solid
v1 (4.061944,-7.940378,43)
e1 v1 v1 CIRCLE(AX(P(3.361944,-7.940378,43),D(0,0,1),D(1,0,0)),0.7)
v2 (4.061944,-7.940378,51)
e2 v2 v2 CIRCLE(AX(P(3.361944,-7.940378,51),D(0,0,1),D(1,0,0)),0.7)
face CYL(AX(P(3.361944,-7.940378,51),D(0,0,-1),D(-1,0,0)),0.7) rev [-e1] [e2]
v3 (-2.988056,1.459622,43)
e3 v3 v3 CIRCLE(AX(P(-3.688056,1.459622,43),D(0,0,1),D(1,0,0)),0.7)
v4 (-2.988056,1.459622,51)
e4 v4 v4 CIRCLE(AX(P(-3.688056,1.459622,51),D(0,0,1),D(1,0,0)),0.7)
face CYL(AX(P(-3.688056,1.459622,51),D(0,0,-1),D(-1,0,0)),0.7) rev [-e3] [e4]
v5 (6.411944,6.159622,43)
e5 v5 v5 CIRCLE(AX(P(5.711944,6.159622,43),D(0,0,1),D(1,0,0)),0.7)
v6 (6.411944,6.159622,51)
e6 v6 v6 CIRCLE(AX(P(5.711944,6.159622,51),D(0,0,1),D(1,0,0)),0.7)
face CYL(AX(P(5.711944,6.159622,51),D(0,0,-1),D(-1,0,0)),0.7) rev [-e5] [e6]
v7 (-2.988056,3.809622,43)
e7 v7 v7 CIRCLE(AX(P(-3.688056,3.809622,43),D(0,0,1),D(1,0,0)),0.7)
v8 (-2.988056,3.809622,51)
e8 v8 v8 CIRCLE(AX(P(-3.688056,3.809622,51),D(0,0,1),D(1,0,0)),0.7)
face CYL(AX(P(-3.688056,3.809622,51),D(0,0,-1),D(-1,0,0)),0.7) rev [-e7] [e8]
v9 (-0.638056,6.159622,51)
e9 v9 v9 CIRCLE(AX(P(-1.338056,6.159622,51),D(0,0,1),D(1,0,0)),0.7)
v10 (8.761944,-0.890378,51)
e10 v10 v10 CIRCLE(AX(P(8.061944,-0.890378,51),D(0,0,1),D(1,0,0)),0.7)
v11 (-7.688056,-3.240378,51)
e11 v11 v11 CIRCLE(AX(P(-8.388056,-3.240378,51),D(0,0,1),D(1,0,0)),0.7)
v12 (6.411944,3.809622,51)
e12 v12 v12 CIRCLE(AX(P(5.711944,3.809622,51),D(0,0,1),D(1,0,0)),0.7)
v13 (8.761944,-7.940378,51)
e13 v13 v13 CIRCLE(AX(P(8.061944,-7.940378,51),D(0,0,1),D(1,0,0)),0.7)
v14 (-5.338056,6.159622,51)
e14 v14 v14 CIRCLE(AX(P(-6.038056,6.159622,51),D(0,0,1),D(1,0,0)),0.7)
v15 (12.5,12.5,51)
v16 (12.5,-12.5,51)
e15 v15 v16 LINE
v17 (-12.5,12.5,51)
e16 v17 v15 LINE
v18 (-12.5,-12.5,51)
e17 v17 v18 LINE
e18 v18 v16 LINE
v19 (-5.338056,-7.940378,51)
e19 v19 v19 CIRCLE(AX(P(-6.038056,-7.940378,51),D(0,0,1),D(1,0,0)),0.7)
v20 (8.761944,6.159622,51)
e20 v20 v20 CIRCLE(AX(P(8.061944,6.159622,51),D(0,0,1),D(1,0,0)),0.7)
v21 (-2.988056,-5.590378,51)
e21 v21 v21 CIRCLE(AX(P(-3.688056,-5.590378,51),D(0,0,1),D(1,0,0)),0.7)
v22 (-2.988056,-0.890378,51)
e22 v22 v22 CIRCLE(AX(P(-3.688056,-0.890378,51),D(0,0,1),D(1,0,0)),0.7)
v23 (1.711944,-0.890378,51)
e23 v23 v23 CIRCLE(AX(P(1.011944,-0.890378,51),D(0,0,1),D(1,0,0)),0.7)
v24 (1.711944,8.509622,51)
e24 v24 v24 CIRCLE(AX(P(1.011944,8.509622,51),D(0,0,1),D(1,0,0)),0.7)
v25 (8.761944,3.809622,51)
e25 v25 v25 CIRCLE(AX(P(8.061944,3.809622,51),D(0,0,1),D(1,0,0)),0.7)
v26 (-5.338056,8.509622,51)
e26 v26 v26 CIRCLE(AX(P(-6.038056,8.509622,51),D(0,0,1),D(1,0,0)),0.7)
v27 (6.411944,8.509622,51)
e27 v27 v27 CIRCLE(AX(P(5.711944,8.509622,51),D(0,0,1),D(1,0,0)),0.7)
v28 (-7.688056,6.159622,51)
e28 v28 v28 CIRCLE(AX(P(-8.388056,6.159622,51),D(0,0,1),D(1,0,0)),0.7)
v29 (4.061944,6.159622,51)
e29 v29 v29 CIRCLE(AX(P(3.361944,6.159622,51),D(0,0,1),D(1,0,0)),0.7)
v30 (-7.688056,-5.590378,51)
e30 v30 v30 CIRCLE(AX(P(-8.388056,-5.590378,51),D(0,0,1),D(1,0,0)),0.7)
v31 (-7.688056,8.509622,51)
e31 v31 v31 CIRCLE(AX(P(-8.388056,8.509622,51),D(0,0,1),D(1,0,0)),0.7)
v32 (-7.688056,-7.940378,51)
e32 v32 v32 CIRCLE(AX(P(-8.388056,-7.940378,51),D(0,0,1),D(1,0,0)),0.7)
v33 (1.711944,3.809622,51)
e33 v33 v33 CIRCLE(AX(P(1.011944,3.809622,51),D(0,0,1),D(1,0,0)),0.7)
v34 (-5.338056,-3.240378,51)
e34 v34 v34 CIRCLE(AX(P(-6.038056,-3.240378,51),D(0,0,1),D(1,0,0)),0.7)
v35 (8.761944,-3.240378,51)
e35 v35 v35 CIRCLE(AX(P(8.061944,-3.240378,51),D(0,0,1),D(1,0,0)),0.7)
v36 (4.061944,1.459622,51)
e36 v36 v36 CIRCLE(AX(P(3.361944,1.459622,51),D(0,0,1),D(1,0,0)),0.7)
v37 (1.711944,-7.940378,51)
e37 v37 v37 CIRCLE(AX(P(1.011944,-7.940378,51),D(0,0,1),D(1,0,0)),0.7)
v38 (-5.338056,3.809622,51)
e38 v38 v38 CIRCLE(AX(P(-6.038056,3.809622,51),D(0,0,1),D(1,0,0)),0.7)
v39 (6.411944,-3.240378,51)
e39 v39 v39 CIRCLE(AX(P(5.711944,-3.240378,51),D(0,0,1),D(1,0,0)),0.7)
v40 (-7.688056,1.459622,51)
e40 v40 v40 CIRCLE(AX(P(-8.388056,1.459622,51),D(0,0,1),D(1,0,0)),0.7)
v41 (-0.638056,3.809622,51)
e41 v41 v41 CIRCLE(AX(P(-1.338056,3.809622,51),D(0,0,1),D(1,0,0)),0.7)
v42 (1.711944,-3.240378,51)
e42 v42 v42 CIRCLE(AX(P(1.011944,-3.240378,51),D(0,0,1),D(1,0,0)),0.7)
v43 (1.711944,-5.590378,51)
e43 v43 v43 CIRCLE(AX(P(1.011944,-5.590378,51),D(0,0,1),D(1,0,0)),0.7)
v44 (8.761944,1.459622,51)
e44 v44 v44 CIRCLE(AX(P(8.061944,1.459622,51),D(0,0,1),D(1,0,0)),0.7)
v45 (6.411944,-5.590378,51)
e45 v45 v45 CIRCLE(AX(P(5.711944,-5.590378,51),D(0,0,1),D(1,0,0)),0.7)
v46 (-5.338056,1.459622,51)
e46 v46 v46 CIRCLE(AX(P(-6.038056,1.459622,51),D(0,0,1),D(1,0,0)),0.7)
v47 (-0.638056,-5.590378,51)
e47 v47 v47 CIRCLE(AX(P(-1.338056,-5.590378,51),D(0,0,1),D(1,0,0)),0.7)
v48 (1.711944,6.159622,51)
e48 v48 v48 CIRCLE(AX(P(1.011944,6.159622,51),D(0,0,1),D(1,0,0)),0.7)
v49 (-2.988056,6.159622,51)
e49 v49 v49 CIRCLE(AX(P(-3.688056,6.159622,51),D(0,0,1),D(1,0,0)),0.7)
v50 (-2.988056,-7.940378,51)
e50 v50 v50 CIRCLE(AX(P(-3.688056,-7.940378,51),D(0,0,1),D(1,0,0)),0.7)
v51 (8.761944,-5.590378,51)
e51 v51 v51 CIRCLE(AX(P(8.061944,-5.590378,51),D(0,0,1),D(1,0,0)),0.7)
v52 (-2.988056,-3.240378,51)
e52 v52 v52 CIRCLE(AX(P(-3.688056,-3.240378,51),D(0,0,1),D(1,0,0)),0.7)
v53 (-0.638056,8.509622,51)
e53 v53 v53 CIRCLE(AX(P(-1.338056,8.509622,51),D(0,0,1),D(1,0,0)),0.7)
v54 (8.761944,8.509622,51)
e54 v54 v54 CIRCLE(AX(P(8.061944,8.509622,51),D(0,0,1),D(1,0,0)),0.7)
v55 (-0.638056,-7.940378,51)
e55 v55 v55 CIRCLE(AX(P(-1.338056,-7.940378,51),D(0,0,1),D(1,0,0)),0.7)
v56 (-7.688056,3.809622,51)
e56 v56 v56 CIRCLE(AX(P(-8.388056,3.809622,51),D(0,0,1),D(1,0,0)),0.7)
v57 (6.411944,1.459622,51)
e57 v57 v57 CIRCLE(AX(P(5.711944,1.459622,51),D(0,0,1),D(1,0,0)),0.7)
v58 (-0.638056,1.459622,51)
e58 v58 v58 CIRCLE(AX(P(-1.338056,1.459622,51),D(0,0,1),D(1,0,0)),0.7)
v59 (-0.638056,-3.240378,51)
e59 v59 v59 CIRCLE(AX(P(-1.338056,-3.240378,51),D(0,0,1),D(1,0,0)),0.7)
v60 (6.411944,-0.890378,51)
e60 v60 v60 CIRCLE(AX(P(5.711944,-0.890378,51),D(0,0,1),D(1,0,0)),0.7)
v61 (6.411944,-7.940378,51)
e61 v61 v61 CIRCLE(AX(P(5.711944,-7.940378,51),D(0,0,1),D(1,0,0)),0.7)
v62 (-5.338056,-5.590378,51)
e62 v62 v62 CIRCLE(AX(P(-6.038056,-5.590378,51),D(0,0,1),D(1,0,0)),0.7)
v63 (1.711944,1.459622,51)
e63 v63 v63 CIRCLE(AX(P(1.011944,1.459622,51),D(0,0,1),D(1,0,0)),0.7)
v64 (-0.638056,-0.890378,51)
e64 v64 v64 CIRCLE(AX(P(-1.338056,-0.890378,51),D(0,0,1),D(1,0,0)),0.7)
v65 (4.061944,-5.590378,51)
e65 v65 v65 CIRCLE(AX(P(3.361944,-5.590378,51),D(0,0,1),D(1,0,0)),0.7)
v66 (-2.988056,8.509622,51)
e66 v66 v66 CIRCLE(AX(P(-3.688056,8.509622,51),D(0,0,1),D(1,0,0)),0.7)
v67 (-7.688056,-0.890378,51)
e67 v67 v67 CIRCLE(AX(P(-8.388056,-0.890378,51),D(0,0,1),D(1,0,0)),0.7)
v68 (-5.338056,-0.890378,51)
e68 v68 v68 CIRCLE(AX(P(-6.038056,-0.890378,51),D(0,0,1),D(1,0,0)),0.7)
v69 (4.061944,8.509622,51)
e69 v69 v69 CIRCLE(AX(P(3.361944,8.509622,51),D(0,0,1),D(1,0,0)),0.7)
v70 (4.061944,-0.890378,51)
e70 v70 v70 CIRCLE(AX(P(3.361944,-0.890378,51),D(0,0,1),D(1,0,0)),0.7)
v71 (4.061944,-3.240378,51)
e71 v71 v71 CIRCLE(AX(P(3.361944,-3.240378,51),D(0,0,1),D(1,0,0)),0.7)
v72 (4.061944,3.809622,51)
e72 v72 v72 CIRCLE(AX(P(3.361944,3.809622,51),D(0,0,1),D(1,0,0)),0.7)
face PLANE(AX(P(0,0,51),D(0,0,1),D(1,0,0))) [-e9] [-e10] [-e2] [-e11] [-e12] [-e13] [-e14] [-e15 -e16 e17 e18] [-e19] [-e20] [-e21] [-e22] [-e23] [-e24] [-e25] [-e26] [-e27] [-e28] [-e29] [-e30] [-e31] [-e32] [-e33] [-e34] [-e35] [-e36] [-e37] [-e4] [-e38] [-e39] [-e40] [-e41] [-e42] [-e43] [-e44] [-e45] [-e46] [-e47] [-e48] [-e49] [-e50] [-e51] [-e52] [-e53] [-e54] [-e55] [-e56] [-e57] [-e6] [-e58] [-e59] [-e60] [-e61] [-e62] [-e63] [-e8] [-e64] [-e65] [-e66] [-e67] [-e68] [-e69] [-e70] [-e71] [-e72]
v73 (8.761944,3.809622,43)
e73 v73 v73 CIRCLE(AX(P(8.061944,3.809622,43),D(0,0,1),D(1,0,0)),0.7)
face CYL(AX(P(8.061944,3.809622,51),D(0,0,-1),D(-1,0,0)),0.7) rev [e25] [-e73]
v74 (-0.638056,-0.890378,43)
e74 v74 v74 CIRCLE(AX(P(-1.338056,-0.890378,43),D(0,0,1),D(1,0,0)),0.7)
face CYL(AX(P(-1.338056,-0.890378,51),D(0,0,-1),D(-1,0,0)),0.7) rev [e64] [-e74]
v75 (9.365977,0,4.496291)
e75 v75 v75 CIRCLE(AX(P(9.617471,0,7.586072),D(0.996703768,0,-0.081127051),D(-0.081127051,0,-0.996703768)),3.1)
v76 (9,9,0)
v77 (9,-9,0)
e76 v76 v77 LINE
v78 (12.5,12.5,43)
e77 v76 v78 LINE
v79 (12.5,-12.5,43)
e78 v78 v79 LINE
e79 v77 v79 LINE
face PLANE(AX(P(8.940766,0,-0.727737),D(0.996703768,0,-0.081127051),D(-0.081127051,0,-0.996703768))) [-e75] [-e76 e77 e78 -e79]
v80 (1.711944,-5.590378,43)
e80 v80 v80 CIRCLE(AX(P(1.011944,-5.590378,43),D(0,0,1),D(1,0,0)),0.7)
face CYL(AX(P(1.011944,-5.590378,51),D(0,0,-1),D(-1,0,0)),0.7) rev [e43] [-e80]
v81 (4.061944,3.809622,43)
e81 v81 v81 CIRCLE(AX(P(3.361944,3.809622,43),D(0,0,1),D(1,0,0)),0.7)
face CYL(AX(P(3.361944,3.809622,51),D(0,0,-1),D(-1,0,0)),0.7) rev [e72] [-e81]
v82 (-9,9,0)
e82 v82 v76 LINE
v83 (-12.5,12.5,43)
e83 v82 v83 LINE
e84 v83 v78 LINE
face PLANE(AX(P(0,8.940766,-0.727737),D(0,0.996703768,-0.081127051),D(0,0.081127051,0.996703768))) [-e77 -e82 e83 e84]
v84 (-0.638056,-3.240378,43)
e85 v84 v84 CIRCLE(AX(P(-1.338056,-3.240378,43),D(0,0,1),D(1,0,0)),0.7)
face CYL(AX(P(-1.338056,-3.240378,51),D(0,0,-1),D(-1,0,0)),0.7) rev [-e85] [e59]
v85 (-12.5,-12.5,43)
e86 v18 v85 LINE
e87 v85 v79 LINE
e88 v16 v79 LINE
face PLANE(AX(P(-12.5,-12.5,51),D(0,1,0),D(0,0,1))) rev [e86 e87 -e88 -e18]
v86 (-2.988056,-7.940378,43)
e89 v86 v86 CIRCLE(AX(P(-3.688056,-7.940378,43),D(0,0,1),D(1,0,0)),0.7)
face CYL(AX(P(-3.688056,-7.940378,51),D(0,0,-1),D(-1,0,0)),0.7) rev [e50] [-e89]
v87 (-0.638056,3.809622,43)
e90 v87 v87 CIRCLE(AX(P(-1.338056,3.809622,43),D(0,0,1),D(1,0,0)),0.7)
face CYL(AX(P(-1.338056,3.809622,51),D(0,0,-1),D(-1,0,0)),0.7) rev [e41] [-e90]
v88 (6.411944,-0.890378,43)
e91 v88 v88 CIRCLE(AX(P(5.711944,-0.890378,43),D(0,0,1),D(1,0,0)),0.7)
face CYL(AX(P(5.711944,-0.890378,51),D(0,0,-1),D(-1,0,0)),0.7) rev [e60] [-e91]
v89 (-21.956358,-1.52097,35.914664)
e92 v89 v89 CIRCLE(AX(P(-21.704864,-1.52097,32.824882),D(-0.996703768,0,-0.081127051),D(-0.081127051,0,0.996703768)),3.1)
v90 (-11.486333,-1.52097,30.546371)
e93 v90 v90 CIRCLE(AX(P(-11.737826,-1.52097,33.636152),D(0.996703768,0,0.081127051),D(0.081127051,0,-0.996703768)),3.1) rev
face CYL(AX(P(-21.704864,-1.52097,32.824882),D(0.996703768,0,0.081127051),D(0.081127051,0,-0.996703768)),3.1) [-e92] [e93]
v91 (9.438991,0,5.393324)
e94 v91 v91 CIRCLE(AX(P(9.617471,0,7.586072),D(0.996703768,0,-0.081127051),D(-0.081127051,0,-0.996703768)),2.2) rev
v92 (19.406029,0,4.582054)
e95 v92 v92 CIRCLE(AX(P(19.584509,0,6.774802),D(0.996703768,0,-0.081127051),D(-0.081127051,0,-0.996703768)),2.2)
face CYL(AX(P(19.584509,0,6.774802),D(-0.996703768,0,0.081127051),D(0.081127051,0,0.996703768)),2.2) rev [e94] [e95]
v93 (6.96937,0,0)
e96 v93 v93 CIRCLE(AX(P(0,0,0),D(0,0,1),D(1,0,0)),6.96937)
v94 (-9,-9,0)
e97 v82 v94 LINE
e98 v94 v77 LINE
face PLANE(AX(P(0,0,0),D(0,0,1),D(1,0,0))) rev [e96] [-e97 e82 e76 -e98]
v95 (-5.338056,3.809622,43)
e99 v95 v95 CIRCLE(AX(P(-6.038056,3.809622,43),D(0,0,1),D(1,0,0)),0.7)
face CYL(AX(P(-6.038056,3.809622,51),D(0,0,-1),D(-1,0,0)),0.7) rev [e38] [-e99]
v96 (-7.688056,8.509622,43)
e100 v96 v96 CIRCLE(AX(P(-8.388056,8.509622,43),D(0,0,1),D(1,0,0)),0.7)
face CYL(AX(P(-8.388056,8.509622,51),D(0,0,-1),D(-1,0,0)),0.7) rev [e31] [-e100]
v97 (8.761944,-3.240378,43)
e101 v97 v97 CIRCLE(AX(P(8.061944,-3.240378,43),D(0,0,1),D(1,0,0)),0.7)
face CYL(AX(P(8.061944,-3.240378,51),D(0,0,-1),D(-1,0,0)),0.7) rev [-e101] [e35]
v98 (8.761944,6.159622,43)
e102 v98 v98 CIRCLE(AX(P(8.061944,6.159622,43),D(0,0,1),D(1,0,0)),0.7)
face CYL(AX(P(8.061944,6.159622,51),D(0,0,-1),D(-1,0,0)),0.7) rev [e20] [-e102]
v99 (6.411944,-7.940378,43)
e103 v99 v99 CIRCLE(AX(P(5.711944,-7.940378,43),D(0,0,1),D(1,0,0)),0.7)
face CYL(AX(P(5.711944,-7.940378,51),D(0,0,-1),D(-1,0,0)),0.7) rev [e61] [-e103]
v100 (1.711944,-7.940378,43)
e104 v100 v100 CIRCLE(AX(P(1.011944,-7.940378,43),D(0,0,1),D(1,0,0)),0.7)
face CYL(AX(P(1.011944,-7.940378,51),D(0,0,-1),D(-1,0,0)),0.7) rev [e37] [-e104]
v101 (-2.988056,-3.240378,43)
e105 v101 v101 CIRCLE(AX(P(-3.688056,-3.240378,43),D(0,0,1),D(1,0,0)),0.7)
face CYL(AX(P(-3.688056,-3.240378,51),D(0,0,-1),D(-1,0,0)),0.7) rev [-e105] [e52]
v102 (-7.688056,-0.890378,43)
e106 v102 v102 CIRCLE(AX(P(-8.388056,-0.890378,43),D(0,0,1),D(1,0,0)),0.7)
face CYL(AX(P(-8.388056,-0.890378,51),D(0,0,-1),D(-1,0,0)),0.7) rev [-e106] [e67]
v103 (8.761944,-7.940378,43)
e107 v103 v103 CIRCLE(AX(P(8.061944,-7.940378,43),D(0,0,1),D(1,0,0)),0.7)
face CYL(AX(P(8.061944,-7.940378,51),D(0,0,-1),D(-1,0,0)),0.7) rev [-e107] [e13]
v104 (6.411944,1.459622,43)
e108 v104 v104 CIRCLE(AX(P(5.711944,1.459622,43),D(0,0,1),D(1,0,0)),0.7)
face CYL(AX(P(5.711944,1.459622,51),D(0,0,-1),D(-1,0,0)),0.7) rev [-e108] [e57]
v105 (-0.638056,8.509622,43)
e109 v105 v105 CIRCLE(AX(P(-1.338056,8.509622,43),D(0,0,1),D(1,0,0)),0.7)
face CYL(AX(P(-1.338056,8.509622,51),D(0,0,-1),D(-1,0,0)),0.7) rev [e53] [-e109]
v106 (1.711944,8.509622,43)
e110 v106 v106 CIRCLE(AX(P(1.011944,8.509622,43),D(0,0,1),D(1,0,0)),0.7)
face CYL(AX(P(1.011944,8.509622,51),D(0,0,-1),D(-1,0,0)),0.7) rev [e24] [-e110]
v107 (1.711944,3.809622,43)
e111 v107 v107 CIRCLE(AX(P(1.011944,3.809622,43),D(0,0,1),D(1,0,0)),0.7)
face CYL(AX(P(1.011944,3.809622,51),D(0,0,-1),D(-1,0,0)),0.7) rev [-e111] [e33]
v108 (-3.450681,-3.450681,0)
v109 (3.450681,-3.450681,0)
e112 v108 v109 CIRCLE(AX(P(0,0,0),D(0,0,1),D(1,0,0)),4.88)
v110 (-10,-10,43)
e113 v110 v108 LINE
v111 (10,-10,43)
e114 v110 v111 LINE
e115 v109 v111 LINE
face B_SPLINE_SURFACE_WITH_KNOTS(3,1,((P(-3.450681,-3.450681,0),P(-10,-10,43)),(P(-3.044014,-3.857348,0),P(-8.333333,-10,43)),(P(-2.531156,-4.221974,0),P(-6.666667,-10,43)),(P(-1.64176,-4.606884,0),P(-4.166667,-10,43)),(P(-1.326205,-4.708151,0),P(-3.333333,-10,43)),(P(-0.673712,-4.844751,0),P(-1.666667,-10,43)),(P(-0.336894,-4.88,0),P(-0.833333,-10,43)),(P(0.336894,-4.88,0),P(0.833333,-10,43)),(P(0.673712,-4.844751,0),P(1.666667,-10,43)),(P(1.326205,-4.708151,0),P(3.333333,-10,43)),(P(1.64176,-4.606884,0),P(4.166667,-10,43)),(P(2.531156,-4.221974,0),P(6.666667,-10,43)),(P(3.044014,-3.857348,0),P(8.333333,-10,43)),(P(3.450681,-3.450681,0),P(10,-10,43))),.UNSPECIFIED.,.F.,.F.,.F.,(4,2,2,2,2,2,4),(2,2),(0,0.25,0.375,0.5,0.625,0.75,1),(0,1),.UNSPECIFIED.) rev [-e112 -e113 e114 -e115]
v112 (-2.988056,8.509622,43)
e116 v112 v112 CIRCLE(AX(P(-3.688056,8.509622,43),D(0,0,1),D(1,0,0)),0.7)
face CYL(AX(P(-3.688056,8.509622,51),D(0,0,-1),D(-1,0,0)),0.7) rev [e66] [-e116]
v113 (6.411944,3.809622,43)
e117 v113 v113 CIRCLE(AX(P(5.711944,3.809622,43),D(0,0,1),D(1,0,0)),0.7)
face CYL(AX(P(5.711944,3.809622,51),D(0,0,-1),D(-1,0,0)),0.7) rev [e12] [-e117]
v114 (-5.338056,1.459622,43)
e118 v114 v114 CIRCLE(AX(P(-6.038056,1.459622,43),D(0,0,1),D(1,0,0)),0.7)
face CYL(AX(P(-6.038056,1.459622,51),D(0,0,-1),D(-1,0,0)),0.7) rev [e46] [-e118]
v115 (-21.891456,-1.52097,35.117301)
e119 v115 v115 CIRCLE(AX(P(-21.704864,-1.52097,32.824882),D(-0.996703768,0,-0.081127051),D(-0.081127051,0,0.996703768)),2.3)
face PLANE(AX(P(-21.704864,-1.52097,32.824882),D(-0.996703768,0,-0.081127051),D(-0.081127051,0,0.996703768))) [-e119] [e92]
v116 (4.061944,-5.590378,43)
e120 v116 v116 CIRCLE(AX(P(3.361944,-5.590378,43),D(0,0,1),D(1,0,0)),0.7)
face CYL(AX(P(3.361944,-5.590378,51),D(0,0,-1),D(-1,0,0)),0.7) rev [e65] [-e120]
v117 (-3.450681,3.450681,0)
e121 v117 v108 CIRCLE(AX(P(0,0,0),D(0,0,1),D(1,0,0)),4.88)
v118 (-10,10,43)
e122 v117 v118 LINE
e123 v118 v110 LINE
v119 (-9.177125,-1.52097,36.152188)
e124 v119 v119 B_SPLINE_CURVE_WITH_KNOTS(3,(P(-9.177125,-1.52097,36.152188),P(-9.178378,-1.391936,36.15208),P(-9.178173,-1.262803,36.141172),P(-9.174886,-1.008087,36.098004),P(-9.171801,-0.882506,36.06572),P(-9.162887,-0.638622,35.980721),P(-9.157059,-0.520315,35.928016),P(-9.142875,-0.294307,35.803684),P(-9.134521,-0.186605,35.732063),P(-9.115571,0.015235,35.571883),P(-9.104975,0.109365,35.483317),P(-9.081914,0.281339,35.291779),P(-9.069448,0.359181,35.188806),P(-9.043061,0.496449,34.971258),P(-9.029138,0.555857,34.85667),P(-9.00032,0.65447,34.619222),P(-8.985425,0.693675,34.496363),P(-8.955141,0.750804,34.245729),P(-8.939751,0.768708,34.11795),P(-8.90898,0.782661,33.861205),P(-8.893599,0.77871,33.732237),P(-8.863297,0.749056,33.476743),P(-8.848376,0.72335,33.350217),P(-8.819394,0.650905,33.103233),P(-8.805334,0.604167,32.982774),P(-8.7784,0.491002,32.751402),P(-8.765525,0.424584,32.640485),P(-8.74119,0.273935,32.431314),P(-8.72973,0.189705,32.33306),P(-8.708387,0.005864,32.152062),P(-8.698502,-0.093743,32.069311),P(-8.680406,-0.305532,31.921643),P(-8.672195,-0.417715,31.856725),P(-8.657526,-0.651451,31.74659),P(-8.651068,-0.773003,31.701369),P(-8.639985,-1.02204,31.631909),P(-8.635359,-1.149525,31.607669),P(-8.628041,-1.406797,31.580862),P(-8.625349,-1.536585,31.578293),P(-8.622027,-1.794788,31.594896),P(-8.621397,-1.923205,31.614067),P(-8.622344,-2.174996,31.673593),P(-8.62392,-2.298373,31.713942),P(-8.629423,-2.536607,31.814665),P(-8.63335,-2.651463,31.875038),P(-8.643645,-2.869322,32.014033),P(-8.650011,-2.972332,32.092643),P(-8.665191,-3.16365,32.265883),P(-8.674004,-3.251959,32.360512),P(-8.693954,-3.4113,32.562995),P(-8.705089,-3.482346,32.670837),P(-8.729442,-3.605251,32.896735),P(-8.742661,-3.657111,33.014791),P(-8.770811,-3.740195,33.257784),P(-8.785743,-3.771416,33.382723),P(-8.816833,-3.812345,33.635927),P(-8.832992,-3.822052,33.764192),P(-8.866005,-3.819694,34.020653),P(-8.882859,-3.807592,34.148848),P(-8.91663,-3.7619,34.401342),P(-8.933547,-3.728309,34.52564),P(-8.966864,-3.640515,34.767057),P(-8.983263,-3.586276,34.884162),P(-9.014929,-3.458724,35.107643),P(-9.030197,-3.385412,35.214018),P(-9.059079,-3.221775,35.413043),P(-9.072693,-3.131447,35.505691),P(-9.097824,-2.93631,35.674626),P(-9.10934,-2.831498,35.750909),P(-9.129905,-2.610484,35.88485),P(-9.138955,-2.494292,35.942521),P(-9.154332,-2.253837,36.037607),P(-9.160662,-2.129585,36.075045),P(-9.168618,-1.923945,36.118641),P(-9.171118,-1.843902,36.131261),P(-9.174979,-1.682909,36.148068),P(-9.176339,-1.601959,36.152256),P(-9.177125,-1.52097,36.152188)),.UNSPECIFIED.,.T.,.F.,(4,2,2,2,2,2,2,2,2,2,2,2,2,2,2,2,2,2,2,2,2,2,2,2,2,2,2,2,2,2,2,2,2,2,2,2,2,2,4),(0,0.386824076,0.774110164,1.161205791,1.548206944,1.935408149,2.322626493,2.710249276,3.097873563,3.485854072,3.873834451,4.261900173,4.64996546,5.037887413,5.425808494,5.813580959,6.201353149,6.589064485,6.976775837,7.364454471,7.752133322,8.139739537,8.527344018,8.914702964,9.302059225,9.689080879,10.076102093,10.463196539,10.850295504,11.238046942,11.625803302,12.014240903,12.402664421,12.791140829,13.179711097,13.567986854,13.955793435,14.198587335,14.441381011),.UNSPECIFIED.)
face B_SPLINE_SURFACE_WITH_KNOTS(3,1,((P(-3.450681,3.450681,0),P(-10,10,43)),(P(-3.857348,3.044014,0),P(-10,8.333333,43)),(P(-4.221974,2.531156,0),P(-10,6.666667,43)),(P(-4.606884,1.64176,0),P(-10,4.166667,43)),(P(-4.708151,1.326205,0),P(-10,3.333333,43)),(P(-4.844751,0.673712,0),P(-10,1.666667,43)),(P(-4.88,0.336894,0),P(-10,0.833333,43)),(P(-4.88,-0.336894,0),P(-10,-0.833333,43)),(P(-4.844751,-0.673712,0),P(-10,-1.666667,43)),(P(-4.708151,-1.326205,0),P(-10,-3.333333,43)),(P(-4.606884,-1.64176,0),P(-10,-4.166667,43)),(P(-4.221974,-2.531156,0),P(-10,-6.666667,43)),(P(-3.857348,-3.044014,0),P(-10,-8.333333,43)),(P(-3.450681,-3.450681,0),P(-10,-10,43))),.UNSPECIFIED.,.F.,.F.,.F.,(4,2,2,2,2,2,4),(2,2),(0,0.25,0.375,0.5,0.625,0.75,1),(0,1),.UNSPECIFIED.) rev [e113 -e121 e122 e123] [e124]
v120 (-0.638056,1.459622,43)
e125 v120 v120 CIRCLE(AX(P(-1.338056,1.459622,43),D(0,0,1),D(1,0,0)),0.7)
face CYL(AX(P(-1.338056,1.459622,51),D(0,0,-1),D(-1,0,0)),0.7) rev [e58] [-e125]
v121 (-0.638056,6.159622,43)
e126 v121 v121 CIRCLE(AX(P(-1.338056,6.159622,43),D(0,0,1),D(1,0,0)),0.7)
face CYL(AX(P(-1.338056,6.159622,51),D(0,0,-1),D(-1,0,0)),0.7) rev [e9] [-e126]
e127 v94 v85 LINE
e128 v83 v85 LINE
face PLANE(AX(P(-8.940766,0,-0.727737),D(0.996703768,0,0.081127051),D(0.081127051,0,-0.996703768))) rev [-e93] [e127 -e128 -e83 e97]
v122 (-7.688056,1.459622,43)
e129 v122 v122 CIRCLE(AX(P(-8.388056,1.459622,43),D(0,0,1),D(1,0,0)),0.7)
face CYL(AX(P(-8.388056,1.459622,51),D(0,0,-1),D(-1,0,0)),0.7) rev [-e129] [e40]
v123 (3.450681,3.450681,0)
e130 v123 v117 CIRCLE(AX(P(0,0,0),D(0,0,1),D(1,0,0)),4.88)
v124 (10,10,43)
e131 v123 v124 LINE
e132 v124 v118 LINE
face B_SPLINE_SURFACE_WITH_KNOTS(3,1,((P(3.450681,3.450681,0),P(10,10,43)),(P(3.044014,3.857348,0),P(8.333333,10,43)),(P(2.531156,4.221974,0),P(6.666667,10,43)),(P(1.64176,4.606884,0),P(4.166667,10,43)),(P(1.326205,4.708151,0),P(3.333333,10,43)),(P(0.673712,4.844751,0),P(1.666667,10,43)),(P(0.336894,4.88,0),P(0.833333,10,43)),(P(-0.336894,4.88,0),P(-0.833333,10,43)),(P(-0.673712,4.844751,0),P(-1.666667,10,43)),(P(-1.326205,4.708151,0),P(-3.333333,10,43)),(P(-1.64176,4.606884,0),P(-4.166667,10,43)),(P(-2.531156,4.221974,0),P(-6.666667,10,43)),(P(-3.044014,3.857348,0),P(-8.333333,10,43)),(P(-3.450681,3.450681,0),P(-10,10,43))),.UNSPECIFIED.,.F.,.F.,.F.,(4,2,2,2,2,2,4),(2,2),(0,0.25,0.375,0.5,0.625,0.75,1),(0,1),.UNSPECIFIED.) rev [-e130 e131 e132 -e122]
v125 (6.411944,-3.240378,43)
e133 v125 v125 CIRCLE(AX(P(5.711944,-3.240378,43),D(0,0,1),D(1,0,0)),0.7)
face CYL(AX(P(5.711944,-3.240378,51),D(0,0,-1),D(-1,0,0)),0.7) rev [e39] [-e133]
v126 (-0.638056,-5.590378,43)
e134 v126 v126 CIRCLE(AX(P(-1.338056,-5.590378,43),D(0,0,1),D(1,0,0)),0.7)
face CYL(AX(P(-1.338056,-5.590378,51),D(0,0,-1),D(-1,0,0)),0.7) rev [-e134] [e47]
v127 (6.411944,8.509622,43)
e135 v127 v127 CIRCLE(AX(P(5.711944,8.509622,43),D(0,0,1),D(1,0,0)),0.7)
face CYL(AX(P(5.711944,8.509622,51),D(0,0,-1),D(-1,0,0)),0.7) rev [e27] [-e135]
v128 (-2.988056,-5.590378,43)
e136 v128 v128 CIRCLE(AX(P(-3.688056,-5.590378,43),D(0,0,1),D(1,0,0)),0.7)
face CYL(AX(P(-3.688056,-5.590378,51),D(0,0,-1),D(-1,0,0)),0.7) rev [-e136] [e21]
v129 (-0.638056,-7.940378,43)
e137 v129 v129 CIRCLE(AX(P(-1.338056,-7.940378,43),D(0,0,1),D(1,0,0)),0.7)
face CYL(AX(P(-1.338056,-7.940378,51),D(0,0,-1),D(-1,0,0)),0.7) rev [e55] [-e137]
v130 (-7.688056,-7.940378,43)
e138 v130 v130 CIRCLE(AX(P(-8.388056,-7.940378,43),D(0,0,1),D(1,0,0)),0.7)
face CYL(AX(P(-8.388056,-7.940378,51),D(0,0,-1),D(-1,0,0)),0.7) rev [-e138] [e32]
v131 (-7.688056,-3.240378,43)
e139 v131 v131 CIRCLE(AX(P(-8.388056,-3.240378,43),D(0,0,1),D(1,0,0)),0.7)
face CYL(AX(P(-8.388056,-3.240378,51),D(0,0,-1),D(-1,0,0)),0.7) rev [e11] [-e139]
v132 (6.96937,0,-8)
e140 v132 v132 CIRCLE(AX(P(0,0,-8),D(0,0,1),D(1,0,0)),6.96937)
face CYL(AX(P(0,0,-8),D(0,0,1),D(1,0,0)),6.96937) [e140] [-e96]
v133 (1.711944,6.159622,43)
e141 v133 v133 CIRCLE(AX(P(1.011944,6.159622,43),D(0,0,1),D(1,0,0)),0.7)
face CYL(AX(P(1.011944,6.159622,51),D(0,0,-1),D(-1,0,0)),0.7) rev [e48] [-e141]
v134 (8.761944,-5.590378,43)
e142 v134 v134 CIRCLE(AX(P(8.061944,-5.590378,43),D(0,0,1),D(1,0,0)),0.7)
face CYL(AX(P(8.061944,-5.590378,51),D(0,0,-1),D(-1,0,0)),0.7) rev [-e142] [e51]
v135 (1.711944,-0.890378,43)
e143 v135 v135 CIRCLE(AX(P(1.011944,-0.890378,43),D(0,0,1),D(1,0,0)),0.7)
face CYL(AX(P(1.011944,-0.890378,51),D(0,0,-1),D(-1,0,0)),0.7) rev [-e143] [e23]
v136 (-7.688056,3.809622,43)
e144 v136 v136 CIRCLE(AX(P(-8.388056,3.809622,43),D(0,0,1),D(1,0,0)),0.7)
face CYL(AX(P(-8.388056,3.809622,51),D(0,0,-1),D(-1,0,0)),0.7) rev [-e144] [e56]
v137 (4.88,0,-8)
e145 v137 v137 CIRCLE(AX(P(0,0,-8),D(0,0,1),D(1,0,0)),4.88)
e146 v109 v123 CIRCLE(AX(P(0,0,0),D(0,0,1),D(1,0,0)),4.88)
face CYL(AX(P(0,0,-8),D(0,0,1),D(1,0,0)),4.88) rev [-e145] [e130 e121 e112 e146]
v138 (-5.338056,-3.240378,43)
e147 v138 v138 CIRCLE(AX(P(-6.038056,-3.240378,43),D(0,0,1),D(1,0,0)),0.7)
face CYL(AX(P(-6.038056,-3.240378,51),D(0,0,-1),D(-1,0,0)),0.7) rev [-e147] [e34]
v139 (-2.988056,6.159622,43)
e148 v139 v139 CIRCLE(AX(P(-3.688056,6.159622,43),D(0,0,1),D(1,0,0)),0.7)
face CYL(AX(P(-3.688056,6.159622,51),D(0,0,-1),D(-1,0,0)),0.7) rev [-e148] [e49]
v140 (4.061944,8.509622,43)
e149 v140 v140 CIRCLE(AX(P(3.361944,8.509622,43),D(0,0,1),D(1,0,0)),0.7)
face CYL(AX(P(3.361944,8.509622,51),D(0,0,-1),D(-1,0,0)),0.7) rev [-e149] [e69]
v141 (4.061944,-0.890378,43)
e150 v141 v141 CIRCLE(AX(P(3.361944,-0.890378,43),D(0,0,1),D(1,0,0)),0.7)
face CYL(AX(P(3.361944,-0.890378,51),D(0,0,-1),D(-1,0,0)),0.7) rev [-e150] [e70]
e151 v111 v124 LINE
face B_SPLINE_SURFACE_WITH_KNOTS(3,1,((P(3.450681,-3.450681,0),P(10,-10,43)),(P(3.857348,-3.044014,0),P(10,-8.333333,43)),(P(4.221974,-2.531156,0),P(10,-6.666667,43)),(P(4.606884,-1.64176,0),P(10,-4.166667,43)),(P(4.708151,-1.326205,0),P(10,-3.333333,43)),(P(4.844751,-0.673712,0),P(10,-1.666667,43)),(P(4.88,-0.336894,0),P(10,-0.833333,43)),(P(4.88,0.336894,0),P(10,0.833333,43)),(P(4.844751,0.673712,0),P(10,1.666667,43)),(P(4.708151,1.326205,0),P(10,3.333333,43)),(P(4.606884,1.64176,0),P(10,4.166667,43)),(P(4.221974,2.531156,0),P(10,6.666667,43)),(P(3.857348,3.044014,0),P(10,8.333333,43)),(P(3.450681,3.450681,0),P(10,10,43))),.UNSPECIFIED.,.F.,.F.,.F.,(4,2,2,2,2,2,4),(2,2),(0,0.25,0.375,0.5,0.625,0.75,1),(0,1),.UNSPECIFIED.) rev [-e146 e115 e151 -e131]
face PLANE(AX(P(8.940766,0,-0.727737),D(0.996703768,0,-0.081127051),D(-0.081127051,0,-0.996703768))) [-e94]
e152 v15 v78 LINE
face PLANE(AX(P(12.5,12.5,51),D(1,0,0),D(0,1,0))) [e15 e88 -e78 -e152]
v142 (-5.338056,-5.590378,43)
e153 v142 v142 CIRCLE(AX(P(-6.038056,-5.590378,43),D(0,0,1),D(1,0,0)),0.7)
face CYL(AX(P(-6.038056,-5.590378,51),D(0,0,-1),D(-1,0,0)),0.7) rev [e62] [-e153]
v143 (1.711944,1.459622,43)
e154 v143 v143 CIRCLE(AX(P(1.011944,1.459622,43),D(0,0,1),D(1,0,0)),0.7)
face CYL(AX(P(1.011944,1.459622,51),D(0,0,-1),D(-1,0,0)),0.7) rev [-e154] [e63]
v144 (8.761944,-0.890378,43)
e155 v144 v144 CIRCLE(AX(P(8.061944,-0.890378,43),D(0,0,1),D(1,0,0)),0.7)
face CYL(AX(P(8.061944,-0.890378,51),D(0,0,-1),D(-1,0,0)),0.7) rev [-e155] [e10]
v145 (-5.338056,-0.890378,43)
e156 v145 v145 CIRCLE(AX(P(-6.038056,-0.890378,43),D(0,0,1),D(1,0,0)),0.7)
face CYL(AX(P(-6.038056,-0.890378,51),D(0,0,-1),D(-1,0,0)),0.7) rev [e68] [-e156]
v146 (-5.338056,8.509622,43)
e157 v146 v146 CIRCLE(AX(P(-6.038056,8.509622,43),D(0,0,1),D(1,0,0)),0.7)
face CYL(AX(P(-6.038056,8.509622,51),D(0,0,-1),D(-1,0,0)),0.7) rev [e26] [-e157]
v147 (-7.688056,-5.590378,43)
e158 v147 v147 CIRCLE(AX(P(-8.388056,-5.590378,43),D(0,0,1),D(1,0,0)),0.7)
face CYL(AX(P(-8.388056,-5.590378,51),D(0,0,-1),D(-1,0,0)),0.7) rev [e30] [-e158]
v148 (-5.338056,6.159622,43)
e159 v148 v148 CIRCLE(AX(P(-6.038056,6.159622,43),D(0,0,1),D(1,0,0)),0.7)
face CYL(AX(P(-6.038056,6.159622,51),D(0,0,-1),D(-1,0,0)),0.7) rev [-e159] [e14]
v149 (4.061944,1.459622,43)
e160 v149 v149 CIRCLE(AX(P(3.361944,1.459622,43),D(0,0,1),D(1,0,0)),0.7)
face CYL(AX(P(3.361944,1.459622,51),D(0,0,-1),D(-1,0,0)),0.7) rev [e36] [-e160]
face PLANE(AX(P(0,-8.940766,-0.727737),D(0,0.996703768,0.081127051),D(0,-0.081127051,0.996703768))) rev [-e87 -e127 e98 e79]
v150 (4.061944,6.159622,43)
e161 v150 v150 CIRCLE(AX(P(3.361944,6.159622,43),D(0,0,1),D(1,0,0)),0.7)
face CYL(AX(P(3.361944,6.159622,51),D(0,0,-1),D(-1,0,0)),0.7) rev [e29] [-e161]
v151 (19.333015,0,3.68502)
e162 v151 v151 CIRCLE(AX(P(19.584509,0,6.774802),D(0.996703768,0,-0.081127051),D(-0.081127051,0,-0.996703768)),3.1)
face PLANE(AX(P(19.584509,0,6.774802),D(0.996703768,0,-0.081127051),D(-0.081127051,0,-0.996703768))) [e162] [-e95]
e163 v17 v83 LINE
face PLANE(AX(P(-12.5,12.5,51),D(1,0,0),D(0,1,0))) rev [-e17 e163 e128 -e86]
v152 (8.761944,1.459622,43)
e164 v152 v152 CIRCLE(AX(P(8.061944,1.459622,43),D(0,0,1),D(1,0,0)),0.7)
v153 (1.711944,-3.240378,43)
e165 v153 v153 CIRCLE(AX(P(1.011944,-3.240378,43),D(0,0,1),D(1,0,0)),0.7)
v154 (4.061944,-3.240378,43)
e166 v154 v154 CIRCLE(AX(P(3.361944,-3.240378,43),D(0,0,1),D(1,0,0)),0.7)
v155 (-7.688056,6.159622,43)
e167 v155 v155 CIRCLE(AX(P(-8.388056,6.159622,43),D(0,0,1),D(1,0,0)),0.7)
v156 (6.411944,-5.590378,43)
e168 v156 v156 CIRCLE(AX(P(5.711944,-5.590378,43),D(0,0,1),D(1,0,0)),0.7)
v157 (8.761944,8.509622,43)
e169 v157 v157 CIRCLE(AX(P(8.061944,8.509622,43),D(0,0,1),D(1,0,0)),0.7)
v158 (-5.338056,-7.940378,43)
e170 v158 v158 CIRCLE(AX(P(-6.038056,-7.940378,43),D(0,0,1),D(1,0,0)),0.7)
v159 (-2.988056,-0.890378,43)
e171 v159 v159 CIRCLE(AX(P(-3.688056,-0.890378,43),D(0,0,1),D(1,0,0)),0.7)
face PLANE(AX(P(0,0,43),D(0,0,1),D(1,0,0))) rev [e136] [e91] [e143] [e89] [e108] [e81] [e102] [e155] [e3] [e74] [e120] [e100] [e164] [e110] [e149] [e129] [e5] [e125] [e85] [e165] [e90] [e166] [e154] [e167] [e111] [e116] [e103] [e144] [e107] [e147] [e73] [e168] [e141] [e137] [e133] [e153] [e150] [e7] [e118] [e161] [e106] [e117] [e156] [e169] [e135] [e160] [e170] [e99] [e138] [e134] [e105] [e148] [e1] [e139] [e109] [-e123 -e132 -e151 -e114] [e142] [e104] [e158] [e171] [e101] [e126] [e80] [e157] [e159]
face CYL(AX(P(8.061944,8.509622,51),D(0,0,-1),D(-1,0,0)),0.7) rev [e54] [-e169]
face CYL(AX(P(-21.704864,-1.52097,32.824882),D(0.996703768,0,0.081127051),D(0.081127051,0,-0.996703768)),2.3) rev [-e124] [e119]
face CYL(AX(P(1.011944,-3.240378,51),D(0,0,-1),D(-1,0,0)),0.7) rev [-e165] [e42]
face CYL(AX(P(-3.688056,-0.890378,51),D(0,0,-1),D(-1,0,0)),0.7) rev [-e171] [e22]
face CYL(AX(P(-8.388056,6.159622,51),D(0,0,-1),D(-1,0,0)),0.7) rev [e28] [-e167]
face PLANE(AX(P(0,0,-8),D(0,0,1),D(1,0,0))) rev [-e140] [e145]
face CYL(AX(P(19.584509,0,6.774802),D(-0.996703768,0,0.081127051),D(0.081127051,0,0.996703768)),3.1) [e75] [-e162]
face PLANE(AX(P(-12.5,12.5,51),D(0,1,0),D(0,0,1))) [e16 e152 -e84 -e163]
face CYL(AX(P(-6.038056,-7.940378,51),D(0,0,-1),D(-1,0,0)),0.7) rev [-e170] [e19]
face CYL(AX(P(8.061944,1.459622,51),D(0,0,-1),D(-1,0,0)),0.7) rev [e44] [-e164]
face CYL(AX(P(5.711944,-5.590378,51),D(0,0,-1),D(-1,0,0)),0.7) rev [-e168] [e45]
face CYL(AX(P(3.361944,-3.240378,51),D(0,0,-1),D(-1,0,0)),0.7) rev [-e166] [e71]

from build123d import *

# Parameters (mm, degrees)
SKETCH2_4_W         = 25
SKETCH2_4_H         = 25
BOSS_EXTRUDE2_DEPTH = 8
SKETCH5_R           = 0.7
CUT_EXTRUDE1_DEPTH  = 8
SKETCH6_R           = 3.1
SKETCH6_R_2         = 2.3
BOSS_EXTRUDE4_DEPTH = 10
CUT_EXTRUDE2_START  = -4
SKETCH6_4_R         = 2.3
CUT_EXTRUDE2_DEPTH  = 4
SKETCH9_R           = 3.1
SKETCH9_R_2         = 2.2
BOSS_EXTRUDE5_DEPTH = 10
SKETCH1_7_R         = 6.969369829
SKETCH1_7_R_2       = 4.88
BOSS_EXTRUDE7_DEPTH = 8


with BuildPart() as part:
    # Sketch1 → Loft1 section 0
    with BuildSketch(Plane.XY):
        with BuildLine():
            Line((-9, 9), (9, 9))
            Line((9, 9), (9, -9))
            Line((9, -9), (-9, -9))
            Line((-9, -9), (-9, 9))
        make_face()
    # Sketch2 → Loft1 section 1
    with BuildSketch(Plane.XY.offset(43)):
        with BuildLine():
            Line((-12.5, 12.5), (12.5, 12.5))
            Line((12.5, 12.5), (12.5, -12.5))
            Line((12.5, -12.5), (-12.5, -12.5))
            Line((-12.5, -12.5), (-12.5, 12.5))
        make_face()
    loft()

    # Cut-Loft1: read off the stored shape, not the designer's step
    # Cut-Loft1: loft between two sections, ruled curve by curve
    cut_loft1_from = [
        Edge.make_bspline([(-3.450681092, -3.450681092, 0), (-3.044014426, -3.857347759, 0), (-2.531155679, -4.22197395, 0), (-1.641760344, -4.606883572, 0), (-1.326204919, -4.708150629, 0), (-0.673711552, -4.84475124, 0), (-0.336893697, -4.88, 0), (0.336893697, -4.88, 0), (0.673711552, -4.84475124, 0), (1.326204919, -4.708150629, 0), (1.641760344, -4.606883572, 0), (2.531155679, -4.22197395, 0), (3.044014426, -3.857347759, 0), (3.450681092, -3.450681092, 0)], [0, 0, 0, 0, 0.25, 0.25, 0.375, 0.375, 0.5, 0.5, 0.625, 0.625, 0.75, 0.75, 1, 1, 1, 1], 3),
        Edge.make_bspline([(3.450681092, -3.450681092, 0), (3.857347759, -3.044014426, 0), (4.22197395, -2.531155679, 0), (4.606883572, -1.641760344, 0), (4.708150629, -1.326204919, 0), (4.84475124, -0.673711552, 0), (4.88, -0.336893697, 0), (4.88, 0.336893697, 0), (4.84475124, 0.673711552, 0), (4.708150629, 1.326204919, 0), (4.606883572, 1.641760344, 0), (4.22197395, 2.531155679, 0), (3.857347759, 3.044014426, 0), (3.450681092, 3.450681092, 0)], [0, 0, 0, 0, 0.25, 0.25, 0.375, 0.375, 0.5, 0.5, 0.625, 0.625, 0.75, 0.75, 1, 1, 1, 1], 3),
        Edge.make_bspline([(-3.450681092, 3.450681092, 0), (-3.857347759, 3.044014426, 0), (-4.22197395, 2.531155679, 0), (-4.606883572, 1.641760344, 0), (-4.708150629, 1.326204919, 0), (-4.84475124, 0.673711552, 0), (-4.88, 0.336893697, 0), (-4.88, -0.336893697, 0), (-4.84475124, -0.673711552, 0), (-4.708150629, -1.326204919, 0), (-4.606883572, -1.641760344, 0), (-4.22197395, -2.531155679, 0), (-3.857347759, -3.044014426, 0), (-3.450681092, -3.450681092, 0)], [0, 0, 0, 0, 0.25, 0.25, 0.375, 0.375, 0.5, 0.5, 0.625, 0.625, 0.75, 0.75, 1, 1, 1, 1], 3),
        Edge.make_bspline([(3.450681092, 3.450681092, 0), (3.044014426, 3.857347759, 0), (2.531155679, 4.22197395, 0), (1.641760344, 4.606883572, 0), (1.326204919, 4.708150629, 0), (0.673711552, 4.84475124, 0), (0.336893697, 4.88, 0), (-0.336893697, 4.88, 0), (-0.673711552, 4.84475124, 0), (-1.326204919, 4.708150629, 0), (-1.641760344, 4.606883572, 0), (-2.531155679, 4.22197395, 0), (-3.044014426, 3.857347759, 0), (-3.450681092, 3.450681092, 0)], [0, 0, 0, 0, 0.25, 0.25, 0.375, 0.375, 0.5, 0.5, 0.625, 0.625, 0.75, 0.75, 1, 1, 1, 1], 3),
    ]
    cut_loft1_to = [
        Edge.make_bspline([(-10, -10, 43), (-8.333333333, -10, 43), (-6.666666667, -10, 43), (-4.166666667, -10, 43), (-3.333333333, -10, 43), (-1.666666667, -10, 43), (-0.833333333, -10, 43), (0.833333333, -10, 43), (1.666666667, -10, 43), (3.333333333, -10, 43), (4.166666667, -10, 43), (6.666666667, -10, 43), (8.333333333, -10, 43), (10, -10, 43)], [0, 0, 0, 0, 0.25, 0.25, 0.375, 0.375, 0.5, 0.5, 0.625, 0.625, 0.75, 0.75, 1, 1, 1, 1], 3),
        Edge.make_bspline([(10, -10, 43), (10, -8.333333333, 43), (10, -6.666666667, 43), (10, -4.166666667, 43), (10, -3.333333333, 43), (10, -1.666666667, 43), (10, -0.833333333, 43), (10, 0.833333333, 43), (10, 1.666666667, 43), (10, 3.333333333, 43), (10, 4.166666667, 43), (10, 6.666666667, 43), (10, 8.333333333, 43), (10, 10, 43)], [0, 0, 0, 0, 0.25, 0.25, 0.375, 0.375, 0.5, 0.5, 0.625, 0.625, 0.75, 0.75, 1, 1, 1, 1], 3),
        Edge.make_bspline([(-10, 10, 43), (-10, 8.333333333, 43), (-10, 6.666666667, 43), (-10, 4.166666667, 43), (-10, 3.333333333, 43), (-10, 1.666666667, 43), (-10, 0.833333333, 43), (-10, -0.833333333, 43), (-10, -1.666666667, 43), (-10, -3.333333333, 43), (-10, -4.166666667, 43), (-10, -6.666666667, 43), (-10, -8.333333333, 43), (-10, -10, 43)], [0, 0, 0, 0, 0.25, 0.25, 0.375, 0.375, 0.5, 0.5, 0.625, 0.625, 0.75, 0.75, 1, 1, 1, 1], 3),
        Edge.make_bspline([(10, 10, 43), (8.333333333, 10, 43), (6.666666667, 10, 43), (4.166666667, 10, 43), (3.333333333, 10, 43), (1.666666667, 10, 43), (0.833333333, 10, 43), (-0.833333333, 10, 43), (-1.666666667, 10, 43), (-3.333333333, 10, 43), (-4.166666667, 10, 43), (-6.666666667, 10, 43), (-8.333333333, 10, 43), (-10, 10, 43)], [0, 0, 0, 0, 0.25, 0.25, 0.375, 0.375, 0.5, 0.5, 0.625, 0.625, 0.75, 0.75, 1, 1, 1, 1], 3),
    ]
    cut_loft1 = Solid(Shell([*[Face.make_surface_from_curves(cut_loft1_from[k], cut_loft1_to[k]) for k in range(4)], Face(Wire(cut_loft1_from)), Face(Wire(cut_loft1_to))]))
    add(cut_loft1, mode=Mode.SUBTRACT)

    # Sketch2<4> → Boss-Extrude2 (add)
    with BuildSketch(Plane.XY.offset(43)):
        Rectangle(SKETCH2_4_W, SKETCH2_4_H)
    extrude(amount=BOSS_EXTRUDE2_DEPTH)

    # Sketch5 → Cut-Extrude1 (cut)
    with BuildSketch(Plane.XY.offset(43)):
        with Locations((-8.388056057, 8.509622087)):
            Circle(SKETCH5_R)
        with Locations((-6.038056057, 8.509622087)):
            Circle(SKETCH5_R)
        with Locations((-3.688056057, 8.509622087)):
            Circle(SKETCH5_R)
        with Locations((-1.338056057, 8.509622087)):
            Circle(SKETCH5_R)
        with Locations((1.011943943, 8.509622087)):
            Circle(SKETCH5_R)
        with Locations((3.361943943, 8.509622087)):
            Circle(SKETCH5_R)
        with Locations((5.711943943, 8.509622087)):
            Circle(SKETCH5_R)
        with Locations((8.061943943, 8.509622087)):
            Circle(SKETCH5_R)
        with Locations((-6.038056057, 6.159622087)):
            Circle(SKETCH5_R)
        with Locations((-3.688056057, 6.159622087)):
            Circle(SKETCH5_R)
        with Locations((-1.338056057, 6.159622087)):
            Circle(SKETCH5_R)
        with Locations((1.011943943, 6.159622087)):
            Circle(SKETCH5_R)
        with Locations((3.361943943, 6.159622087)):
            Circle(SKETCH5_R)
        with Locations((5.711943943, 6.159622087)):
            Circle(SKETCH5_R)
        with Locations((8.061943943, 6.159622087)):
            Circle(SKETCH5_R)
        with Locations((-6.038056057, 3.809622087)):
            Circle(SKETCH5_R)
        with Locations((-3.688056057, 3.809622087)):
            Circle(SKETCH5_R)
        with Locations((-1.338056057, 3.809622087)):
            Circle(SKETCH5_R)
        with Locations((1.011943943, 3.809622087)):
            Circle(SKETCH5_R)
        with Locations((3.361943943, 3.809622087)):
            Circle(SKETCH5_R)
        with Locations((5.711943943, 3.809622087)):
            Circle(SKETCH5_R)
        with Locations((8.061943943, 3.809622087)):
            Circle(SKETCH5_R)
        with Locations((-6.038056057, 1.459622087)):
            Circle(SKETCH5_R)
        with Locations((-3.688056057, 1.459622087)):
            Circle(SKETCH5_R)
        with Locations((-1.338056057, 1.459622087)):
            Circle(SKETCH5_R)
        with Locations((1.011943943, 1.459622087)):
            Circle(SKETCH5_R)
        with Locations((3.361943943, 1.459622087)):
            Circle(SKETCH5_R)
        with Locations((5.711943943, 1.459622087)):
            Circle(SKETCH5_R)
        with Locations((8.061943943, 1.459622087)):
            Circle(SKETCH5_R)
        with Locations((-6.038056057, -0.890377913)):
            Circle(SKETCH5_R)
        with Locations((-3.688056057, -0.890377913)):
            Circle(SKETCH5_R)
        with Locations((-1.338056057, -0.890377913)):
            Circle(SKETCH5_R)
        with Locations((1.011943943, -0.890377913)):
            Circle(SKETCH5_R)
        with Locations((3.361943943, -0.890377913)):
            Circle(SKETCH5_R)
        with Locations((5.711943943, -0.890377913)):
            Circle(SKETCH5_R)
        with Locations((8.061943943, -0.890377913)):
            Circle(SKETCH5_R)
        with Locations((-6.038056057, -3.240377913)):
            Circle(SKETCH5_R)
        with Locations((-3.688056057, -3.240377913)):
            Circle(SKETCH5_R)
        with Locations((-1.338056057, -3.240377913)):
            Circle(SKETCH5_R)
        with Locations((1.011943943, -3.240377913)):
            Circle(SKETCH5_R)
        with Locations((3.361943943, -3.240377913)):
            Circle(SKETCH5_R)
        with Locations((5.711943943, -3.240377913)):
            Circle(SKETCH5_R)
        with Locations((8.061943943, -3.240377913)):
            Circle(SKETCH5_R)
        with Locations((-6.038056057, -5.590377913)):
            Circle(SKETCH5_R)
        with Locations((-3.688056057, -5.590377913)):
            Circle(SKETCH5_R)
        with Locations((-1.338056057, -5.590377913)):
            Circle(SKETCH5_R)
        with Locations((1.011943943, -5.590377913)):
            Circle(SKETCH5_R)
        with Locations((3.361943943, -5.590377913)):
            Circle(SKETCH5_R)
        with Locations((5.711943943, -5.590377913)):
            Circle(SKETCH5_R)
        with Locations((8.061943943, -5.590377913)):
            Circle(SKETCH5_R)
        with Locations((-6.038056057, -7.940377913)):
            Circle(SKETCH5_R)
        with Locations((-3.688056057, -7.940377913)):
            Circle(SKETCH5_R)
        with Locations((-1.338056057, -7.940377913)):
            Circle(SKETCH5_R)
        with Locations((1.011943943, -7.940377913)):
            Circle(SKETCH5_R)
        with Locations((3.361943943, -7.940377913)):
            Circle(SKETCH5_R)
        with Locations((5.711943943, -7.940377913)):
            Circle(SKETCH5_R)
        with Locations((8.061943943, -7.940377913)):
            Circle(SKETCH5_R)
        with Locations((-8.388056057, 6.159622087)):
            Circle(SKETCH5_R)
        with Locations((-8.388056057, 3.809622087)):
            Circle(SKETCH5_R)
        with Locations((-8.388056057, 1.459622087)):
            Circle(SKETCH5_R)
        with Locations((-8.388056057, -0.890377913)):
            Circle(SKETCH5_R)
        with Locations((-8.388056057, -3.240377913)):
            Circle(SKETCH5_R)
        with Locations((-8.388056057, -5.590377913)):
            Circle(SKETCH5_R)
        with Locations((-8.388056057, -7.940377913)):
            Circle(SKETCH5_R)
    extrude(amount=CUT_EXTRUDE1_DEPTH, mode=Mode.SUBTRACT)

    # Sketch6 → Boss-Extrude4 (add)
    with BuildSketch(Plane(origin=(-8.940765615, 0, -0.727736736), x_dir=(-0.08112705090276601, 0, 0.9967037682339824), z_dir=(-0.9967037682339824, 0, -0.08112705090276602))):
        with Locations(Location((34.477535136, -1.520969622, 0), (0, 0, 180))):
            Circle(SKETCH6_R)
        with Locations((34.477535136, -1.520969622)):
            Circle(SKETCH6_R_2, mode=Mode.SUBTRACT)
    extrude(amount=BOSS_EXTRUDE4_DEPTH)

    # Sketch6<4> → Cut-Extrude2 (cut)
    with BuildSketch(Plane(origin=(-8.940765615, 0, -0.727736736), x_dir=(-0.08112705090276601, 0, 0.9967037682339824), z_dir=(-0.9967037682339824, 0, -0.08112705090276602)).offset(CUT_EXTRUDE2_START)):
        with Locations((34.477535136, -1.520969622)):
            Circle(SKETCH6_4_R)
    extrude(amount=CUT_EXTRUDE2_DEPTH, mode=Mode.SUBTRACT)

    # Sketch9 → Boss-Extrude5 (add)
    with BuildSketch(Plane(origin=(8.940765615, 0, -0.727736736), x_dir=(-0.08112705090276603, 0, -0.9967037682339824), z_dir=(0.9967037682339824, 0, -0.08112705090276605))):
        with Locations((-8.341303969, 0)):
            Circle(SKETCH9_R)
        with Locations((-8.341303969, 0)):
            Circle(SKETCH9_R_2, mode=Mode.SUBTRACT)
    extrude(amount=BOSS_EXTRUDE5_DEPTH)

    # Sketch1<7> → Boss-Extrude7 (add)
    with BuildSketch(Plane.XY):
        Circle(SKETCH1_7_R)
        Circle(SKETCH1_7_R_2, mode=Mode.SUBTRACT)
    extrude(amount=-BOSS_EXTRUDE7_DEPTH)


solid = part.part
